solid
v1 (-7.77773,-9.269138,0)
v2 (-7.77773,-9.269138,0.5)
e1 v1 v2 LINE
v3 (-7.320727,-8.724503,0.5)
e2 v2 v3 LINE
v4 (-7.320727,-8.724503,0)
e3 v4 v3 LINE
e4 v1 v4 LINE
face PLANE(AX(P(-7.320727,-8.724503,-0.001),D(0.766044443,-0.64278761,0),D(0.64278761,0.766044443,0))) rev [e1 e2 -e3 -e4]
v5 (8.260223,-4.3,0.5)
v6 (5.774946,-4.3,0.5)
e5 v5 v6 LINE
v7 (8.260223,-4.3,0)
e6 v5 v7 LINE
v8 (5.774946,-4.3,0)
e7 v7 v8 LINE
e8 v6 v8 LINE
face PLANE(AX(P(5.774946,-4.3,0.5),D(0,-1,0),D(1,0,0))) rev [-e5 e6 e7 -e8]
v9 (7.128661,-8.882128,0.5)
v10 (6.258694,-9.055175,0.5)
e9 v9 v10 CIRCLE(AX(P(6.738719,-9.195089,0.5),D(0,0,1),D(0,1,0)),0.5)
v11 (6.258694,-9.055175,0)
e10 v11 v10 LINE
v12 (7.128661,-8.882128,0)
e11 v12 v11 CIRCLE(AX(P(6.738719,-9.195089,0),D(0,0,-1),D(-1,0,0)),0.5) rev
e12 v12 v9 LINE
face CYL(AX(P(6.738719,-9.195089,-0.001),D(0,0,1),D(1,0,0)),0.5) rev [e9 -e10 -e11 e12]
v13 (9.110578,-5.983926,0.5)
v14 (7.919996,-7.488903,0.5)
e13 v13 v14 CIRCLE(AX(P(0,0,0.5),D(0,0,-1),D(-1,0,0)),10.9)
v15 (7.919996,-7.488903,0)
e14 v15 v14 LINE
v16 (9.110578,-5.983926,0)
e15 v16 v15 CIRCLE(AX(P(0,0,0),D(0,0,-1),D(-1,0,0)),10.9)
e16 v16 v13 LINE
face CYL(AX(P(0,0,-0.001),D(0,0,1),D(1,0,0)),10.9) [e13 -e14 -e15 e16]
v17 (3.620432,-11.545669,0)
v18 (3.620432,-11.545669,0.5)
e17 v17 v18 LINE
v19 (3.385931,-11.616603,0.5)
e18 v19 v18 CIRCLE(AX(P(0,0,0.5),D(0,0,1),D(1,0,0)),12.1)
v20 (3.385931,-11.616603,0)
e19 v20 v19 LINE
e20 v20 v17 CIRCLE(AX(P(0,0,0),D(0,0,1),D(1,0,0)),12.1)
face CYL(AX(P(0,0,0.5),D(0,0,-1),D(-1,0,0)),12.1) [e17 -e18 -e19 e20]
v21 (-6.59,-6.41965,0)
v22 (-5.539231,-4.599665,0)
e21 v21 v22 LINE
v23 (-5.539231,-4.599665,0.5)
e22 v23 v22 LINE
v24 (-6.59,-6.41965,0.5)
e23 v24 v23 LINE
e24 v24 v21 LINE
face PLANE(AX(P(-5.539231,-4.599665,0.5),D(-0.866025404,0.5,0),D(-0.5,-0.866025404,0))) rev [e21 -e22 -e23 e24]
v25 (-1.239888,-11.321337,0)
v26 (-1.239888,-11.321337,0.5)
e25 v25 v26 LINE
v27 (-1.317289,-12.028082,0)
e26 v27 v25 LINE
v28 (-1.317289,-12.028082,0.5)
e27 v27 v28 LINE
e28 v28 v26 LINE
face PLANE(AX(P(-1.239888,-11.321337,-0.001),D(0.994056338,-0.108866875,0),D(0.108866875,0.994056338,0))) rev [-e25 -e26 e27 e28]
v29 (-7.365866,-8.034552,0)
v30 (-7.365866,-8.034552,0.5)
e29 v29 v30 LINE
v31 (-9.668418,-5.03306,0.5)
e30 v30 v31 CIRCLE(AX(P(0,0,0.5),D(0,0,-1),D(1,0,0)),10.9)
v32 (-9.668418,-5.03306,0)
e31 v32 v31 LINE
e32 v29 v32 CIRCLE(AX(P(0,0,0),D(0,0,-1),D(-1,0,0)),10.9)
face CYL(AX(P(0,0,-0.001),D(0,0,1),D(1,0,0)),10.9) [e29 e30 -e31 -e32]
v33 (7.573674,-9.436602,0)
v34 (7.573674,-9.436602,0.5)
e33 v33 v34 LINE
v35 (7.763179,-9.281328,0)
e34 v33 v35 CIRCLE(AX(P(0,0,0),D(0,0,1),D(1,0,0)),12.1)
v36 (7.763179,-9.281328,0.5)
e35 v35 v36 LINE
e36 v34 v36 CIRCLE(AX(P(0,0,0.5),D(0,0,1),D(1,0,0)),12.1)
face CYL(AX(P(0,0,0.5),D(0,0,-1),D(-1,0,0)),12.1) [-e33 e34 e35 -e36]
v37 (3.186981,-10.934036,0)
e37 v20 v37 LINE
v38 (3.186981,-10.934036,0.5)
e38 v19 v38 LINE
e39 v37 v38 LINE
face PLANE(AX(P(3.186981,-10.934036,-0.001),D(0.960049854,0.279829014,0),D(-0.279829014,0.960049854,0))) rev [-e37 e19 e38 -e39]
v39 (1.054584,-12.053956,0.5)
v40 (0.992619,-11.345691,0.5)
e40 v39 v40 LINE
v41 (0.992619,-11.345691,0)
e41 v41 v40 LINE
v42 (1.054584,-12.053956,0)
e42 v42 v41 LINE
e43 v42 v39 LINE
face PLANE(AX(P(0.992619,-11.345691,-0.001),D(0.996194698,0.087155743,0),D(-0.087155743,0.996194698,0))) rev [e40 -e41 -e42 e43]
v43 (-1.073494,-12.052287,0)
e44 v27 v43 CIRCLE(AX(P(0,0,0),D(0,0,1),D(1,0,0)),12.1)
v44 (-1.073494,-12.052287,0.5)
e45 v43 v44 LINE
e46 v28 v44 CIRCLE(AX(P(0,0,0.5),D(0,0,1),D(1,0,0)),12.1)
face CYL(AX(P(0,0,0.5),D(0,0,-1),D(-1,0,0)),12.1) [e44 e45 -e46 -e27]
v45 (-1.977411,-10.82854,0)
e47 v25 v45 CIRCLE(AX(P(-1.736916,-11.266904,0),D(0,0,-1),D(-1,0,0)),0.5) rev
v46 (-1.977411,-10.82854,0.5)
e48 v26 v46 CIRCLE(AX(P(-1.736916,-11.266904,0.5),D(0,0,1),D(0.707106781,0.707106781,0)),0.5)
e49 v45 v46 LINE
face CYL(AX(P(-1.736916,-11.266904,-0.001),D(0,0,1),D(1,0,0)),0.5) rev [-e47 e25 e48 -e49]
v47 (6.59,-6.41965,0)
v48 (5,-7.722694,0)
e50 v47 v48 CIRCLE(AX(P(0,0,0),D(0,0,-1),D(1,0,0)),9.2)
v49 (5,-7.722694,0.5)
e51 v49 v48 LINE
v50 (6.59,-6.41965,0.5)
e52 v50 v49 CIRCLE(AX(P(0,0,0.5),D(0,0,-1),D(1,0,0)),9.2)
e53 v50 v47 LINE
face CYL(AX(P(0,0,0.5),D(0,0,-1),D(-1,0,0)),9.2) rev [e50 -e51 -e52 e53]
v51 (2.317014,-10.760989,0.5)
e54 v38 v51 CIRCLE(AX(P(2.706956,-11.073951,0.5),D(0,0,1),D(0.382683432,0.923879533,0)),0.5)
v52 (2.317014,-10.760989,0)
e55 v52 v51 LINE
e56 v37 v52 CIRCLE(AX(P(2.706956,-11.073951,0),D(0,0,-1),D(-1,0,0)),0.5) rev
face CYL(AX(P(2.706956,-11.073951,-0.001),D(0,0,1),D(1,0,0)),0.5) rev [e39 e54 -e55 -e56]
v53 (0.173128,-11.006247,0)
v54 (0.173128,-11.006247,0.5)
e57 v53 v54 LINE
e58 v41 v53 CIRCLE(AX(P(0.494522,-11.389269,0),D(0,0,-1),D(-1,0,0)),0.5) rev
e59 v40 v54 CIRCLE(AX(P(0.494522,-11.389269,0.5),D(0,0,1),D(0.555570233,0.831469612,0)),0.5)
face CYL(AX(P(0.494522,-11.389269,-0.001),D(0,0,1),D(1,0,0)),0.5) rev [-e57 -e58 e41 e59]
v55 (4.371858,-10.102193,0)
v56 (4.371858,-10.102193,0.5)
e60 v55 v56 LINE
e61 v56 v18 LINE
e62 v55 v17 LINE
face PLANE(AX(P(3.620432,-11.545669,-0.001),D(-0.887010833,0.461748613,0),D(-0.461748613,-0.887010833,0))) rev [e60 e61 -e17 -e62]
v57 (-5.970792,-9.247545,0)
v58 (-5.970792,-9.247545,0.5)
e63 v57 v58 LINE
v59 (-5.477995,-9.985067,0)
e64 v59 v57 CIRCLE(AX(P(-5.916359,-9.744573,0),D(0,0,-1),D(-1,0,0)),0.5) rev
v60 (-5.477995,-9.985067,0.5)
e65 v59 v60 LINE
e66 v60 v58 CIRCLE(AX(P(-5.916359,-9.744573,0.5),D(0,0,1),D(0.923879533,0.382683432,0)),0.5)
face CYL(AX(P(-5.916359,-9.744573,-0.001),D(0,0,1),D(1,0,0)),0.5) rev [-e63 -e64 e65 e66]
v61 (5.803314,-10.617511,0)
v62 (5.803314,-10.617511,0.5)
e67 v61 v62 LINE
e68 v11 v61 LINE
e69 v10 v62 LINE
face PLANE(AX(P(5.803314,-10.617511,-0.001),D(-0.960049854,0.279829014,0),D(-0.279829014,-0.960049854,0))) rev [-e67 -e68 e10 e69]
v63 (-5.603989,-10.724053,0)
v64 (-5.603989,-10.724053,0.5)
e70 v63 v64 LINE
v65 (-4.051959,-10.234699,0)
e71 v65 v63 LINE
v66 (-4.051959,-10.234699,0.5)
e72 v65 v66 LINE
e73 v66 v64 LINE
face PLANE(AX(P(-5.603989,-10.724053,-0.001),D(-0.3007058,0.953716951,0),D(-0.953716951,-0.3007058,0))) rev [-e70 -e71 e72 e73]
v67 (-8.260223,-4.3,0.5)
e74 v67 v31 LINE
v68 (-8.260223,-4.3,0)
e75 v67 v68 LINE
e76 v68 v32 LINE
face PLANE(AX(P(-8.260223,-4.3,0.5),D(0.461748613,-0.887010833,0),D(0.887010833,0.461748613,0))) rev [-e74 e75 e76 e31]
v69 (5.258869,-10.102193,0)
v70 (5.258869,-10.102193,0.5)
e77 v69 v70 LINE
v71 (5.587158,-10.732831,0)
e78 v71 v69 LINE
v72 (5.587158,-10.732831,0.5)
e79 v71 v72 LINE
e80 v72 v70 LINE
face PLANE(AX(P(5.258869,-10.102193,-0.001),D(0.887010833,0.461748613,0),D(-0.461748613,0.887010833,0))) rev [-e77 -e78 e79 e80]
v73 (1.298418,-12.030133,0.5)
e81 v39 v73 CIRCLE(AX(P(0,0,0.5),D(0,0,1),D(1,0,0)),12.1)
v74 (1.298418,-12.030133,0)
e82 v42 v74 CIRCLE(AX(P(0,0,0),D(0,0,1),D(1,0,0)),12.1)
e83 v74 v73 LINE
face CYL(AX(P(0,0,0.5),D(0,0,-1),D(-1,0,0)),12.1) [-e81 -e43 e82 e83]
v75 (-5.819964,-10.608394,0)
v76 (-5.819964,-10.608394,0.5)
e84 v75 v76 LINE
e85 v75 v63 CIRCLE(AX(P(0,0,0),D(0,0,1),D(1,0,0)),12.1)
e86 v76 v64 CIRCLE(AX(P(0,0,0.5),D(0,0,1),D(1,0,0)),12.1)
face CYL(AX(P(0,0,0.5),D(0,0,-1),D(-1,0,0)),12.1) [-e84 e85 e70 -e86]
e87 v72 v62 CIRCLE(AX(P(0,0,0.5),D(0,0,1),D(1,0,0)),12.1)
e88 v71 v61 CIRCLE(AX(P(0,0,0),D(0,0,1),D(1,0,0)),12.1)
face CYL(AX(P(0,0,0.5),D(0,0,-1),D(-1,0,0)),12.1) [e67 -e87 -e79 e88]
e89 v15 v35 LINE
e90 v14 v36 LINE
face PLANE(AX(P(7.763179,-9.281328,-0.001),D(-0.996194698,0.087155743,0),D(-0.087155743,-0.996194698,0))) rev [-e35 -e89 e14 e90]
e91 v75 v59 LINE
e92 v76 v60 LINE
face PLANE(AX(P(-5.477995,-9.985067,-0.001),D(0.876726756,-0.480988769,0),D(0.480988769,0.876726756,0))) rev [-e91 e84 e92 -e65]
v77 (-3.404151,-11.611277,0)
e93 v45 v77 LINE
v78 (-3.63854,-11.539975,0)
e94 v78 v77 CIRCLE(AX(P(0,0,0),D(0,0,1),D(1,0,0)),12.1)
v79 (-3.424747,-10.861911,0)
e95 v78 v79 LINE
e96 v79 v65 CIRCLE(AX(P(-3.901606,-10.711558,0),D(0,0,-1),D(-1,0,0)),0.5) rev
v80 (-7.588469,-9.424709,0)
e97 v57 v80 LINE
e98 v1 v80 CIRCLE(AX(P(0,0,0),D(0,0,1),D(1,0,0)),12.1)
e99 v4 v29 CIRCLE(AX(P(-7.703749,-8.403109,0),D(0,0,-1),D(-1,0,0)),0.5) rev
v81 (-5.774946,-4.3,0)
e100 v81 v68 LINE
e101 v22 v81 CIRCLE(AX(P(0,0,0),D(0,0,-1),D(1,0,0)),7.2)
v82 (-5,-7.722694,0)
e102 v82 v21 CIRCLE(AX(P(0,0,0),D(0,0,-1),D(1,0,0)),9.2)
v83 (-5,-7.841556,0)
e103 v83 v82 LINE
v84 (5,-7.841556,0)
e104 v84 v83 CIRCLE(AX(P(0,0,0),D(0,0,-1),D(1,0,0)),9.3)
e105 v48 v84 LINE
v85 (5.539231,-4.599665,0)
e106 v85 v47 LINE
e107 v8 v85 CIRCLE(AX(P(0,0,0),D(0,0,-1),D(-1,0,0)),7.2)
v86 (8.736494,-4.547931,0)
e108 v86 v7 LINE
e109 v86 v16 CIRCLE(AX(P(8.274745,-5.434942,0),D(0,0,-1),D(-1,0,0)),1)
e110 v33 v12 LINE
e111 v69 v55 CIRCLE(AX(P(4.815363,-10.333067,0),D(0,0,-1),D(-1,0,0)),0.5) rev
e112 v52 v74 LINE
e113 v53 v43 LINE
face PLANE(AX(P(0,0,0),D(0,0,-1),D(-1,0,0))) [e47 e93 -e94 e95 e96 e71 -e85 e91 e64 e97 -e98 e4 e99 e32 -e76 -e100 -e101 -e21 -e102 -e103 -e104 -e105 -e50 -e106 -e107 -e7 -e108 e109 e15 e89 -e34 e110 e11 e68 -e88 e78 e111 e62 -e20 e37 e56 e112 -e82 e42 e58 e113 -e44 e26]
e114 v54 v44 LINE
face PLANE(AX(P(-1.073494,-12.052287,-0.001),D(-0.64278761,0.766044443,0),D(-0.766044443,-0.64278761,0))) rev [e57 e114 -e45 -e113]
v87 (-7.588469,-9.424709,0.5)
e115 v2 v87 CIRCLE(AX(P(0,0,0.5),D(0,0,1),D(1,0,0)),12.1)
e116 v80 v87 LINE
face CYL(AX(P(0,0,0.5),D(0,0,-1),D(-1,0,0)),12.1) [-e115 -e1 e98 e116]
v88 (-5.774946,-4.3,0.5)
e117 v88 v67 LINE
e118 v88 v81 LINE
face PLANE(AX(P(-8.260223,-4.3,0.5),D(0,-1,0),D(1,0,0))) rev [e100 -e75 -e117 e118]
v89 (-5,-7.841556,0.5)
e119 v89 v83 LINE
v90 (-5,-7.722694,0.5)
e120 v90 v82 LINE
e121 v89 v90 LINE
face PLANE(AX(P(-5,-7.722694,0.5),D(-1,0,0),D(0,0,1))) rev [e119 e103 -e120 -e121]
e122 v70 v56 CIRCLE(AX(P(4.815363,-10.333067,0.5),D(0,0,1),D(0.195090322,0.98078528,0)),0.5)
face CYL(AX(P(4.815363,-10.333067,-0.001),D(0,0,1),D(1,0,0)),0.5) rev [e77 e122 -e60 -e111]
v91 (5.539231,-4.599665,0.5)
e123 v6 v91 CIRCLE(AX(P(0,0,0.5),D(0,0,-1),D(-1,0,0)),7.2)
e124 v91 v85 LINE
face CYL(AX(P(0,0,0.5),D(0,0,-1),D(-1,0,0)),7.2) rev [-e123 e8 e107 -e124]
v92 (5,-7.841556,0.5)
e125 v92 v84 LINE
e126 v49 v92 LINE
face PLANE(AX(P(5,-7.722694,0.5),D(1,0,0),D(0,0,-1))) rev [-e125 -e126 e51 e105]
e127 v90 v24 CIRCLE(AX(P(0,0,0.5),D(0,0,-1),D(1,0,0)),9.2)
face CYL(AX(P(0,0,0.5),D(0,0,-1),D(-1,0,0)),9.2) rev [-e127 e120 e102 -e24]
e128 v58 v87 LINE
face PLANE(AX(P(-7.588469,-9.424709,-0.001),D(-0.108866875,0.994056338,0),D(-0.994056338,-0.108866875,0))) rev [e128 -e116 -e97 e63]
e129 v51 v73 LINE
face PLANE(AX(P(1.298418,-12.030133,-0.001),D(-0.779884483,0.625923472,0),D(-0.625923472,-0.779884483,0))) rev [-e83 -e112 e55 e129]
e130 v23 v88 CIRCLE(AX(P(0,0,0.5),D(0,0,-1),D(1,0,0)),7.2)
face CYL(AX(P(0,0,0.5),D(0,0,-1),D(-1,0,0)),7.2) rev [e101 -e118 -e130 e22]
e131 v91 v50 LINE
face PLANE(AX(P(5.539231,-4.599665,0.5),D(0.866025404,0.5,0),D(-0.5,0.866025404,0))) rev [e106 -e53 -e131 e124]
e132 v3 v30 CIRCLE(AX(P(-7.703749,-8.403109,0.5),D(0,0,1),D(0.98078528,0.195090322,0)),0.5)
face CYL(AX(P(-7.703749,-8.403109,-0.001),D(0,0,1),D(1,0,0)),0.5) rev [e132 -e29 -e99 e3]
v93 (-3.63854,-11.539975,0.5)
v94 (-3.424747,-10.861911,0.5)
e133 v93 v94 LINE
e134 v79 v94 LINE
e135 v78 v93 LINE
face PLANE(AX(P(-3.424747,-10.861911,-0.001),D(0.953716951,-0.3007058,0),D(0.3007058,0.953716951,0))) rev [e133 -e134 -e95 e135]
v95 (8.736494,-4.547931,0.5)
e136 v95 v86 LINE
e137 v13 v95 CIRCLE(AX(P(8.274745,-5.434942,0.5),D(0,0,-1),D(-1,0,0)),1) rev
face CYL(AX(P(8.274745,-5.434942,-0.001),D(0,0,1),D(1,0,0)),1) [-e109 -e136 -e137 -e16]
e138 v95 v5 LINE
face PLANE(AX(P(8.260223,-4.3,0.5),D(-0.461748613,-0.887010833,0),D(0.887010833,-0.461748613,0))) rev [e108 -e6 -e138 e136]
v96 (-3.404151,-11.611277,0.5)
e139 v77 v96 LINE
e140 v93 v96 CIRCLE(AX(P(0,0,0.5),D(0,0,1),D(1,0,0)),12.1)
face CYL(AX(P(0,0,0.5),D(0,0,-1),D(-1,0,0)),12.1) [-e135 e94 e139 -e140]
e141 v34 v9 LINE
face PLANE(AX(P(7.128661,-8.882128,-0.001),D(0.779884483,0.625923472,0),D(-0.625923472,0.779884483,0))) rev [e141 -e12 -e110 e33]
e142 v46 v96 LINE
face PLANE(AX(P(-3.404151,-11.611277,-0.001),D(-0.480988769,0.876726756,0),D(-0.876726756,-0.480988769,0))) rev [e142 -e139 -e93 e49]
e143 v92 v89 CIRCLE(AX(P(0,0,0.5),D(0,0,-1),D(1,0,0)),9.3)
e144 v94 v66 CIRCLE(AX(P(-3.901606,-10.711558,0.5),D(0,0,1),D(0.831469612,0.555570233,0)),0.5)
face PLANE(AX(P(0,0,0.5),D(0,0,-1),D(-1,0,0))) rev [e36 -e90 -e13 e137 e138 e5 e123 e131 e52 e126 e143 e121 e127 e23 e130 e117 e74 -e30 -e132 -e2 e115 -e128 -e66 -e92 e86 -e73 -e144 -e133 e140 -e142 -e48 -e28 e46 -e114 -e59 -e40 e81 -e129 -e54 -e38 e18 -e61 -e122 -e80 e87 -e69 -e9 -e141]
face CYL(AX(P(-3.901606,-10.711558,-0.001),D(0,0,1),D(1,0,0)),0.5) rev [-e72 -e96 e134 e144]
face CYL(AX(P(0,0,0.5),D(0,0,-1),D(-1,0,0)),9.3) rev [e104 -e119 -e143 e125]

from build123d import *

# Parameters (mm, degrees)
OTHER_10076_5_DEPTH = 0.5
CUT_EXTRUDE1_START  = -0.5
CUT_EXTRUDE1_DEPTH  = 0.5


# Read off the part's stored shape, not the designer's step: 10076-5
with BuildPart() as part:
    # Other 10076-5 outline → Other 10076-5 (new body)
    with BuildSketch(Plane.XY):
        with BuildLine():
            ThreePointArc((7.573674013, -9.436602245), (7.668819519, -9.359444812), (7.763179028, -9.281328104))
            Line((7.763179028, -9.281328104), (7.919995926, -7.488902759))
            ThreePointArc((7.919995926, -7.488902759), (8.548470738, -6.76266575), (9.110578105, -5.983925684))
            ThreePointArc((9.110578105, -5.983925684), (9.242448569, -5.182849851), (8.736493865, -4.547930843))
            Line((8.736493865, -4.547930843), (8.260223146, -4.3))
            Line((8.260223146, -4.3), (5.774945887, -4.3))
            ThreePointArc((5.774945887, -4.3), (5.659072475, -4.451392897), (5.53923133, -4.5996648))
            Line((5.53923133, -4.5996648), (6.59, -6.419649523))
            ThreePointArc((6.59, -6.419649523), (5.831509763, -7.1157216), (5, -7.722693831))
            Line((5, -7.722693831), (5, -7.841555968))
            ThreePointArc((5, -7.841555968), (0, -9.3), (-5, -7.841555968))
            Line((-5, -7.841555968), (-5, -7.722693831))
            ThreePointArc((-5, -7.722693831), (-5.831509763, -7.1157216), (-6.59, -6.419649523))
            Line((-6.59, -6.419649523), (-5.53923133, -4.5996648))
            ThreePointArc((-5.53923133, -4.5996648), (-5.659072475, -4.451392897), (-5.774945887, -4.3))
            Line((-5.774945887, -4.3), (-8.260223146, -4.3))
            Line((-8.260223146, -4.3), (-10.732831081, -5.58715822))
            ThreePointArc((-10.732831081, -5.58715822), (-10.675718173, -5.6955282), (-10.617511084, -5.803314431))
            Line((-10.617511084, -5.803314431), (-9.055174855, -6.258693914))
            ThreePointArc((-9.055174855, -6.258693914), (-8.704696722, -6.64117368), (-8.882127626, -7.128661083))
            Line((-8.882127626, -7.128661083), (-9.436602245, -7.573674013))
            ThreePointArc((-9.436602245, -7.573674013), (-9.359444812, -7.668819519), (-9.281328104, -7.763179028))
            Line((-9.281328104, -7.763179028), (-7.660171598, -7.905011844))
            ThreePointArc((-7.660171598, -7.905011844), (-7.241809703, -8.211767477), (-7.320727248, -8.724502998))
            Line((-7.320727248, -8.724502998), (-7.777730077, -9.269137762))
            ThreePointArc((-7.777730077, -9.269137762), (-7.683493234, -9.347402405), (-7.588468891, -9.424709008))
            Line((-7.588468891, -9.424709008), (-5.970792243, -9.247544602))
            ThreePointArc((-5.970792243, -9.247544602), (-5.500623999, -9.466787654), (-5.477995427, -9.985067155))
            Line((-5.477995427, -9.985067155), (-5.819964104, -10.608393744))
            ThreePointArc((-5.819964104, -10.608393744), (-5.712269322, -10.666769858), (-5.603989074, -10.724052707))
            Line((-5.603989074, -10.724052707), (-4.05195869, -10.234699407))
            ThreePointArc((-4.05195869, -10.234699407), (-3.548052399, -10.358004491), (-3.424747314, -10.861910782))
            Line((-3.424747314, -10.861910782), (-3.638540174, -11.539975104))
            ThreePointArc((-3.638540174, -11.539975104), (-3.521526102, -11.576219327), (-3.404151099, -11.611277074))
            Line((-3.404151099, -11.611277074), (-1.977410637, -10.828540453))
            ThreePointArc((-1.977410637, -10.828540453), (-1.459131136, -10.851169025), (-1.239888083, -11.321337268))
            Line((-1.239888083, -11.321337268), (-1.317289186, -12.028081692))
            ThreePointArc((-1.317289186, -12.028081692), (-1.195452609, -12.04080118), (-1.073493507, -12.052286575))
            Line((-1.073493507, -12.052286575), (0.173128198, -11.006246762))
            ThreePointArc((0.173128198, -11.006246762), (0.685863719, -10.927329218), (0.992619352, -11.345691113))
            Line((0.992619352, -11.345691113), (1.054584487, -12.053955847))
            ThreePointArc((1.054584487, -12.053955847), (1.176561457, -12.042661796), (1.298417839, -12.030133462))
            Line((1.298417839, -12.030133462), (2.317013814, -10.760989181))
            ThreePointArc((2.317013814, -10.760989181), (2.804501216, -10.583558277), (3.186980982, -10.93403641))
            Line((3.186980982, -10.93403641), (3.38593107, -11.616603238))
            ThreePointArc((3.38593107, -11.616603238), (3.503360927, -11.581729673), (3.620431715, -11.545669067))
            Line((3.620431715, -11.545669067), (4.371857887, -10.10219282))
            ThreePointArc((4.371857887, -10.10219282), (4.815363304, -9.833067127), (5.258868721, -10.10219282))
            Line((5.258868721, -10.10219282), (5.58715822, -10.732831081))
            ThreePointArc((5.58715822, -10.732831081), (5.6955282, -10.675718173), (5.803314431, -10.617511084))
            Line((5.803314431, -10.617511084), (6.258693914, -9.055174855))
            ThreePointArc((6.258693914, -9.055174855), (6.64117368, -8.704696722), (7.128661083, -8.882127626))
            Line((7.128661083, -8.882127626), (7.573674013, -9.436602245))
        make_face()
    extrude(amount=OTHER_10076_5_DEPTH)

    # Sketch1 → Cut-Extrude1 (cut)
    with BuildSketch(Plane.XY.offset(0.5).offset(CUT_EXTRUDE1_START)):
        with BuildLine():
            Line((-9.668418082, -5.033059884), (-10.732831081, -5.58715822))
            ThreePointArc((-10.732831081, -5.58715822), (-10.066052286, -6.714506042), (-9.281328104, -7.763179028))
            Line((-9.281328104, -7.763179028), (-7.660171598, -7.905011844))
            ThreePointArc((-7.660171598, -7.905011844), (-7.502321095, -7.945477671), (-7.365865721, -8.034551772))
            ThreePointArc((-7.365865721, -8.034551772), (-8.648349239, -6.634459695), (-9.668418082, -5.033059884))
        make_face()
    extrude(amount=CUT_EXTRUDE1_DEPTH, mode=Mode.SUBTRACT)


solid = part.part
